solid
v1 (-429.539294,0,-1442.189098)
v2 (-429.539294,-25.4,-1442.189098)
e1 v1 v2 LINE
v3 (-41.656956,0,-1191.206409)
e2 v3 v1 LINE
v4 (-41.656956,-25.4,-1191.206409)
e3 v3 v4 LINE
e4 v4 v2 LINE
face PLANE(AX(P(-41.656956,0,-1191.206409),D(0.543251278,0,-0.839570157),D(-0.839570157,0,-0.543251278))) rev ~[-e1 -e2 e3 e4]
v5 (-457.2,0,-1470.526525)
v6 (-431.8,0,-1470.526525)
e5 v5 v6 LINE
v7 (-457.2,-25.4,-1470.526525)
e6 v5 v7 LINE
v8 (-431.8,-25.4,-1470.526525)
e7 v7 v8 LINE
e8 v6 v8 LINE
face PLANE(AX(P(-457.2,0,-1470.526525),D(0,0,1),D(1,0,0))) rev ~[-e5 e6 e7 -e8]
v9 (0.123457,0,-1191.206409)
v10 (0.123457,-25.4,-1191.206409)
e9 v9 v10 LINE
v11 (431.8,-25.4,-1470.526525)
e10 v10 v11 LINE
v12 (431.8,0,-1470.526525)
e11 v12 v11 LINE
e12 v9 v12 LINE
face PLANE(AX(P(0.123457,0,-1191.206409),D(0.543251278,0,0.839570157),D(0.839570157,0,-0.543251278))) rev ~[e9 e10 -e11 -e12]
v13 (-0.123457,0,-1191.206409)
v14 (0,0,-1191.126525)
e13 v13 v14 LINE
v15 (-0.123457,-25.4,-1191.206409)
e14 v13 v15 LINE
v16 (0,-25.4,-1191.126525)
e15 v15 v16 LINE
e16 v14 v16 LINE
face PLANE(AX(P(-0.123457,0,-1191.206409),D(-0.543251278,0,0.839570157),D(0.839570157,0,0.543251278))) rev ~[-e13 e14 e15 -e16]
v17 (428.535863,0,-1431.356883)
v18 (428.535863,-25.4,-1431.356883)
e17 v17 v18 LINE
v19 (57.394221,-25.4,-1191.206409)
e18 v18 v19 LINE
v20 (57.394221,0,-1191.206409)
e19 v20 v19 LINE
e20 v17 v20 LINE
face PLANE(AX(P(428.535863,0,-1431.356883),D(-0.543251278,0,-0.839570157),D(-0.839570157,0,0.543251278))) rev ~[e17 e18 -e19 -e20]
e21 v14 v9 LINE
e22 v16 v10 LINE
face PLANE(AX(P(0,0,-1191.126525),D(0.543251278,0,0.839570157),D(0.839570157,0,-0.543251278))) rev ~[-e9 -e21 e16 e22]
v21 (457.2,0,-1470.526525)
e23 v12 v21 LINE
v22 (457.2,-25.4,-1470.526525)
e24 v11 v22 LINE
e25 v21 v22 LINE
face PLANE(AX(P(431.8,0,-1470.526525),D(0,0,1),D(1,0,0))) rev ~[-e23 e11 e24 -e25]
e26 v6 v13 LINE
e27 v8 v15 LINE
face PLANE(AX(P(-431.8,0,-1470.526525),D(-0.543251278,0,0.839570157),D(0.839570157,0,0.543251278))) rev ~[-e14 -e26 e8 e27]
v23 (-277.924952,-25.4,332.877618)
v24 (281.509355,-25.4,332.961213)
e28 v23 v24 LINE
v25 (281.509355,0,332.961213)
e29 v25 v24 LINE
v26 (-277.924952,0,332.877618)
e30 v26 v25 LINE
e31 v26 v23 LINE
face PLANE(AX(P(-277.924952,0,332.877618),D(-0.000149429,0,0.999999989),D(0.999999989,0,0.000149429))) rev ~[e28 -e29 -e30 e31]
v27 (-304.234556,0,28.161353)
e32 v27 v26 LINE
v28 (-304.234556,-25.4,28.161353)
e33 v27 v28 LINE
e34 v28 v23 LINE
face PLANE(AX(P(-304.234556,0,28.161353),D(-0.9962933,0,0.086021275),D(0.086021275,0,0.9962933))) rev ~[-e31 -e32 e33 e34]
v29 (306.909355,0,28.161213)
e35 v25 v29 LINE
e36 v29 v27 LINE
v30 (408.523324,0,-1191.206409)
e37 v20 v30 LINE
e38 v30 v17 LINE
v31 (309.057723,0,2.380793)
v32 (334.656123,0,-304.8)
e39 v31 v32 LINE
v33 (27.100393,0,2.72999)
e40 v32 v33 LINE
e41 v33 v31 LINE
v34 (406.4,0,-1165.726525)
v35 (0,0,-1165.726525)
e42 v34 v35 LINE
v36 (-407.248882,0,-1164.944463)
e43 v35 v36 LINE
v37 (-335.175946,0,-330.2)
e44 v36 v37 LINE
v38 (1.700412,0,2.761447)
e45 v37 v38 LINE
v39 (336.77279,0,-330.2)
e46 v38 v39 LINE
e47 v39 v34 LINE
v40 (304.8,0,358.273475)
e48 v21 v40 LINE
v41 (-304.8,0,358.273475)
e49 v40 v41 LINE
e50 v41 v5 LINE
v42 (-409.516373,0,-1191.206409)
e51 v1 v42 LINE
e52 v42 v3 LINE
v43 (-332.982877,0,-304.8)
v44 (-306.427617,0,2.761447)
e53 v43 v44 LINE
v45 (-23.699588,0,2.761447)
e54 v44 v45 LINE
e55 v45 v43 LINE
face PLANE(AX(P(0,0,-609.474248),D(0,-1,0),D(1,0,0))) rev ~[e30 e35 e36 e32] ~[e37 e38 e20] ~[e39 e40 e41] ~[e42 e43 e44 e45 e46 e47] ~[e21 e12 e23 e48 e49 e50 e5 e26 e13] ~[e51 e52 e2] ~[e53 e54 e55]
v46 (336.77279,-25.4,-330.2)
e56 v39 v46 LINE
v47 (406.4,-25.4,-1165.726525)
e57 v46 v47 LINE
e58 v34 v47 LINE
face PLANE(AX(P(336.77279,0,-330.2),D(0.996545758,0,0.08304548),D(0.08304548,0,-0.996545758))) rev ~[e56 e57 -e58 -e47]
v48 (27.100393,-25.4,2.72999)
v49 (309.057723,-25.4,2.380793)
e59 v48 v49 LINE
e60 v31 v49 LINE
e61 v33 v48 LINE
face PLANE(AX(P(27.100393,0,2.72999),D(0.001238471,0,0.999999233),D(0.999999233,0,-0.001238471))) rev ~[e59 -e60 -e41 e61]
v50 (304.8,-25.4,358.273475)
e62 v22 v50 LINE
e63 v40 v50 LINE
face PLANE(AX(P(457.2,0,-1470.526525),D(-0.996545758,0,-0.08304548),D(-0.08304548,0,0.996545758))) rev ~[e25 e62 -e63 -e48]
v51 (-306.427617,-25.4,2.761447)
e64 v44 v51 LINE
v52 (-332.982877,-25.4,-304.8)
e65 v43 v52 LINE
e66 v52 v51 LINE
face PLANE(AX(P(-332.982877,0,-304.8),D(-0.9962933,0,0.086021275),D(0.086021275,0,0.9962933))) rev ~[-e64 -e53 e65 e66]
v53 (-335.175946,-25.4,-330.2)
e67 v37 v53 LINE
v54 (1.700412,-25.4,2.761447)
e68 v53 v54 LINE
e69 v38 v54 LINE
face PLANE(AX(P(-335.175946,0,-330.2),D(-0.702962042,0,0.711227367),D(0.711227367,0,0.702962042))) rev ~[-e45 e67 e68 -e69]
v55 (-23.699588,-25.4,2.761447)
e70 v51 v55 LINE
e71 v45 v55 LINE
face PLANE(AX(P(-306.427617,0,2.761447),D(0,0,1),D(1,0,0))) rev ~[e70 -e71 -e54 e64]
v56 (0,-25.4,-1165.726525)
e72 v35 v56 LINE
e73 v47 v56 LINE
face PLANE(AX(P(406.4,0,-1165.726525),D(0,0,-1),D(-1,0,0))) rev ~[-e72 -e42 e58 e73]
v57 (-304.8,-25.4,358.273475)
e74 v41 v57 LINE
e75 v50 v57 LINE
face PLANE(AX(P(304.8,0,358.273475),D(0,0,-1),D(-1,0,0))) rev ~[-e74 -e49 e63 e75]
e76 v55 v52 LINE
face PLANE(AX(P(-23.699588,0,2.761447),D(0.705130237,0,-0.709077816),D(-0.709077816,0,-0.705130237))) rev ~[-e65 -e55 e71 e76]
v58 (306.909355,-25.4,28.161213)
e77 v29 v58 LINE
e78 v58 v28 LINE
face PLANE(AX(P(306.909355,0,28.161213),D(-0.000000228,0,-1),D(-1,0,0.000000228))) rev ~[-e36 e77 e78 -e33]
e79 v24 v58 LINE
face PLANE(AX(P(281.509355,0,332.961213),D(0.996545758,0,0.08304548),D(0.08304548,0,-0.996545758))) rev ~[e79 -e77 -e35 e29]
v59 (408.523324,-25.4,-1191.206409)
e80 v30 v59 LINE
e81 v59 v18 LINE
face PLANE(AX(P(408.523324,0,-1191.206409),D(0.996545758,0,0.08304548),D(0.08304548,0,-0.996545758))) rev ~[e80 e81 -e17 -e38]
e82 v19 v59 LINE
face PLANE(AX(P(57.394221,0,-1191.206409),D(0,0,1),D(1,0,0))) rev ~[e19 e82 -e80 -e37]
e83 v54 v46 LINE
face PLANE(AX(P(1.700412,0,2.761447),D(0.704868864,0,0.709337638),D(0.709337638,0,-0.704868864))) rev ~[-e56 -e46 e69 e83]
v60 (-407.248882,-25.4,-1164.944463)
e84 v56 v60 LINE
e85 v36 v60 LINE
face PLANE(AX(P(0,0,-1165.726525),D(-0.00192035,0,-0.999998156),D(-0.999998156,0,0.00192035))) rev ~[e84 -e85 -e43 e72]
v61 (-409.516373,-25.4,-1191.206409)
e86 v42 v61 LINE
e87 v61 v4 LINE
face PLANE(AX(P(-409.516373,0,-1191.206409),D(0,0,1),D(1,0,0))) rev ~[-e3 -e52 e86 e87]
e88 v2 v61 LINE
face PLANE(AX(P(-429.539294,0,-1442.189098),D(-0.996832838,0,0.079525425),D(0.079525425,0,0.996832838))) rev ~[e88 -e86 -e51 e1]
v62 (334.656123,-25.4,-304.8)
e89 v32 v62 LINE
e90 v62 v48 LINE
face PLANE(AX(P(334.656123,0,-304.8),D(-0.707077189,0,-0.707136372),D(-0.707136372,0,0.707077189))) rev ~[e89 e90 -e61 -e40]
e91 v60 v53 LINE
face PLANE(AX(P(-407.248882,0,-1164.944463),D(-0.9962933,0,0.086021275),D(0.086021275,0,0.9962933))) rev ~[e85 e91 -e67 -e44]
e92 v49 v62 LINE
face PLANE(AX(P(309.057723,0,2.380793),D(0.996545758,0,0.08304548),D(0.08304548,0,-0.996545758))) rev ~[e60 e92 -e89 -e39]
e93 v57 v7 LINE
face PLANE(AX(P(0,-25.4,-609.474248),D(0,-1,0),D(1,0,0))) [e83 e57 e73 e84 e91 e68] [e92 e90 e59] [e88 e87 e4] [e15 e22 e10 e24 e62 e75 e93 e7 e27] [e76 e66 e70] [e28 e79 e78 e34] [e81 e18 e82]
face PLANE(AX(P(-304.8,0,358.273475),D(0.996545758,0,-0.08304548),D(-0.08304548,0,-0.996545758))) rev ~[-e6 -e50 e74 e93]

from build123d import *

# Parameters (mm, degrees)
F1_DEPTH = 25.4


# Not quite as in the source:
# - a feature names something its author has since deleted; it is built from what else it names


with BuildPart() as f1:
    # F0 (on Front) → F1 (new body)
    with BuildSketch(Plane.XZ):
        Polygon((0, 358.2734752655), (-304.8, 358.2734752655), (-457.2, -1470.5265247345), (-431.8, -1470.5265247337), (-0.1234569215, -1191.2064086248), (-1e-10, -1191.1265247345), (0.1234569213, -1191.2064086248), (431.8, -1470.5265247345), (457.2, -1470.5265247345), (304.8, 358.2734752655), align=None)
        Polygon((-429.5392940648, -1442.1890979106), (-409.5163731819, -1191.2064086248), (-41.6569560767, -1191.2064086248), align=None, mode=Mode.SUBTRACT)
        Polygon((0, -1165.7265247345), (-407.2488822076, -1164.9444627713), (-335.1759464959, -330.2), (1.7004121065, 2.7614467587), (336.7727896055, -330.2), (406.4, -1165.7265247345), align=None, mode=Mode.SUBTRACT)
        Polygon((57.3942214249, -1191.2064086248), (408.5233236575, -1191.2064086248), (428.535863163, -1431.3568826906), align=None, mode=Mode.SUBTRACT)
        Polygon((-23.6995878935, 2.7614467587), (-332.9828770612, -304.8), (-306.4276168969, 2.7614467587), align=None, mode=Mode.SUBTRACT)
        Polygon((334.6561229388, -304.8), (27.1003926271, 2.7299896004), (309.0577234879, 2.380793411), align=None, mode=Mode.SUBTRACT)
        Polygon((-277.9249521719, 332.8776175298), (281.5093551883, 332.9612130061), (306.9093551883, 28.1612130061), (-304.2345555955, 28.1613525589), align=None, mode=Mode.SUBTRACT)
    extrude(amount=F1_DEPTH)


solid = f1.part
